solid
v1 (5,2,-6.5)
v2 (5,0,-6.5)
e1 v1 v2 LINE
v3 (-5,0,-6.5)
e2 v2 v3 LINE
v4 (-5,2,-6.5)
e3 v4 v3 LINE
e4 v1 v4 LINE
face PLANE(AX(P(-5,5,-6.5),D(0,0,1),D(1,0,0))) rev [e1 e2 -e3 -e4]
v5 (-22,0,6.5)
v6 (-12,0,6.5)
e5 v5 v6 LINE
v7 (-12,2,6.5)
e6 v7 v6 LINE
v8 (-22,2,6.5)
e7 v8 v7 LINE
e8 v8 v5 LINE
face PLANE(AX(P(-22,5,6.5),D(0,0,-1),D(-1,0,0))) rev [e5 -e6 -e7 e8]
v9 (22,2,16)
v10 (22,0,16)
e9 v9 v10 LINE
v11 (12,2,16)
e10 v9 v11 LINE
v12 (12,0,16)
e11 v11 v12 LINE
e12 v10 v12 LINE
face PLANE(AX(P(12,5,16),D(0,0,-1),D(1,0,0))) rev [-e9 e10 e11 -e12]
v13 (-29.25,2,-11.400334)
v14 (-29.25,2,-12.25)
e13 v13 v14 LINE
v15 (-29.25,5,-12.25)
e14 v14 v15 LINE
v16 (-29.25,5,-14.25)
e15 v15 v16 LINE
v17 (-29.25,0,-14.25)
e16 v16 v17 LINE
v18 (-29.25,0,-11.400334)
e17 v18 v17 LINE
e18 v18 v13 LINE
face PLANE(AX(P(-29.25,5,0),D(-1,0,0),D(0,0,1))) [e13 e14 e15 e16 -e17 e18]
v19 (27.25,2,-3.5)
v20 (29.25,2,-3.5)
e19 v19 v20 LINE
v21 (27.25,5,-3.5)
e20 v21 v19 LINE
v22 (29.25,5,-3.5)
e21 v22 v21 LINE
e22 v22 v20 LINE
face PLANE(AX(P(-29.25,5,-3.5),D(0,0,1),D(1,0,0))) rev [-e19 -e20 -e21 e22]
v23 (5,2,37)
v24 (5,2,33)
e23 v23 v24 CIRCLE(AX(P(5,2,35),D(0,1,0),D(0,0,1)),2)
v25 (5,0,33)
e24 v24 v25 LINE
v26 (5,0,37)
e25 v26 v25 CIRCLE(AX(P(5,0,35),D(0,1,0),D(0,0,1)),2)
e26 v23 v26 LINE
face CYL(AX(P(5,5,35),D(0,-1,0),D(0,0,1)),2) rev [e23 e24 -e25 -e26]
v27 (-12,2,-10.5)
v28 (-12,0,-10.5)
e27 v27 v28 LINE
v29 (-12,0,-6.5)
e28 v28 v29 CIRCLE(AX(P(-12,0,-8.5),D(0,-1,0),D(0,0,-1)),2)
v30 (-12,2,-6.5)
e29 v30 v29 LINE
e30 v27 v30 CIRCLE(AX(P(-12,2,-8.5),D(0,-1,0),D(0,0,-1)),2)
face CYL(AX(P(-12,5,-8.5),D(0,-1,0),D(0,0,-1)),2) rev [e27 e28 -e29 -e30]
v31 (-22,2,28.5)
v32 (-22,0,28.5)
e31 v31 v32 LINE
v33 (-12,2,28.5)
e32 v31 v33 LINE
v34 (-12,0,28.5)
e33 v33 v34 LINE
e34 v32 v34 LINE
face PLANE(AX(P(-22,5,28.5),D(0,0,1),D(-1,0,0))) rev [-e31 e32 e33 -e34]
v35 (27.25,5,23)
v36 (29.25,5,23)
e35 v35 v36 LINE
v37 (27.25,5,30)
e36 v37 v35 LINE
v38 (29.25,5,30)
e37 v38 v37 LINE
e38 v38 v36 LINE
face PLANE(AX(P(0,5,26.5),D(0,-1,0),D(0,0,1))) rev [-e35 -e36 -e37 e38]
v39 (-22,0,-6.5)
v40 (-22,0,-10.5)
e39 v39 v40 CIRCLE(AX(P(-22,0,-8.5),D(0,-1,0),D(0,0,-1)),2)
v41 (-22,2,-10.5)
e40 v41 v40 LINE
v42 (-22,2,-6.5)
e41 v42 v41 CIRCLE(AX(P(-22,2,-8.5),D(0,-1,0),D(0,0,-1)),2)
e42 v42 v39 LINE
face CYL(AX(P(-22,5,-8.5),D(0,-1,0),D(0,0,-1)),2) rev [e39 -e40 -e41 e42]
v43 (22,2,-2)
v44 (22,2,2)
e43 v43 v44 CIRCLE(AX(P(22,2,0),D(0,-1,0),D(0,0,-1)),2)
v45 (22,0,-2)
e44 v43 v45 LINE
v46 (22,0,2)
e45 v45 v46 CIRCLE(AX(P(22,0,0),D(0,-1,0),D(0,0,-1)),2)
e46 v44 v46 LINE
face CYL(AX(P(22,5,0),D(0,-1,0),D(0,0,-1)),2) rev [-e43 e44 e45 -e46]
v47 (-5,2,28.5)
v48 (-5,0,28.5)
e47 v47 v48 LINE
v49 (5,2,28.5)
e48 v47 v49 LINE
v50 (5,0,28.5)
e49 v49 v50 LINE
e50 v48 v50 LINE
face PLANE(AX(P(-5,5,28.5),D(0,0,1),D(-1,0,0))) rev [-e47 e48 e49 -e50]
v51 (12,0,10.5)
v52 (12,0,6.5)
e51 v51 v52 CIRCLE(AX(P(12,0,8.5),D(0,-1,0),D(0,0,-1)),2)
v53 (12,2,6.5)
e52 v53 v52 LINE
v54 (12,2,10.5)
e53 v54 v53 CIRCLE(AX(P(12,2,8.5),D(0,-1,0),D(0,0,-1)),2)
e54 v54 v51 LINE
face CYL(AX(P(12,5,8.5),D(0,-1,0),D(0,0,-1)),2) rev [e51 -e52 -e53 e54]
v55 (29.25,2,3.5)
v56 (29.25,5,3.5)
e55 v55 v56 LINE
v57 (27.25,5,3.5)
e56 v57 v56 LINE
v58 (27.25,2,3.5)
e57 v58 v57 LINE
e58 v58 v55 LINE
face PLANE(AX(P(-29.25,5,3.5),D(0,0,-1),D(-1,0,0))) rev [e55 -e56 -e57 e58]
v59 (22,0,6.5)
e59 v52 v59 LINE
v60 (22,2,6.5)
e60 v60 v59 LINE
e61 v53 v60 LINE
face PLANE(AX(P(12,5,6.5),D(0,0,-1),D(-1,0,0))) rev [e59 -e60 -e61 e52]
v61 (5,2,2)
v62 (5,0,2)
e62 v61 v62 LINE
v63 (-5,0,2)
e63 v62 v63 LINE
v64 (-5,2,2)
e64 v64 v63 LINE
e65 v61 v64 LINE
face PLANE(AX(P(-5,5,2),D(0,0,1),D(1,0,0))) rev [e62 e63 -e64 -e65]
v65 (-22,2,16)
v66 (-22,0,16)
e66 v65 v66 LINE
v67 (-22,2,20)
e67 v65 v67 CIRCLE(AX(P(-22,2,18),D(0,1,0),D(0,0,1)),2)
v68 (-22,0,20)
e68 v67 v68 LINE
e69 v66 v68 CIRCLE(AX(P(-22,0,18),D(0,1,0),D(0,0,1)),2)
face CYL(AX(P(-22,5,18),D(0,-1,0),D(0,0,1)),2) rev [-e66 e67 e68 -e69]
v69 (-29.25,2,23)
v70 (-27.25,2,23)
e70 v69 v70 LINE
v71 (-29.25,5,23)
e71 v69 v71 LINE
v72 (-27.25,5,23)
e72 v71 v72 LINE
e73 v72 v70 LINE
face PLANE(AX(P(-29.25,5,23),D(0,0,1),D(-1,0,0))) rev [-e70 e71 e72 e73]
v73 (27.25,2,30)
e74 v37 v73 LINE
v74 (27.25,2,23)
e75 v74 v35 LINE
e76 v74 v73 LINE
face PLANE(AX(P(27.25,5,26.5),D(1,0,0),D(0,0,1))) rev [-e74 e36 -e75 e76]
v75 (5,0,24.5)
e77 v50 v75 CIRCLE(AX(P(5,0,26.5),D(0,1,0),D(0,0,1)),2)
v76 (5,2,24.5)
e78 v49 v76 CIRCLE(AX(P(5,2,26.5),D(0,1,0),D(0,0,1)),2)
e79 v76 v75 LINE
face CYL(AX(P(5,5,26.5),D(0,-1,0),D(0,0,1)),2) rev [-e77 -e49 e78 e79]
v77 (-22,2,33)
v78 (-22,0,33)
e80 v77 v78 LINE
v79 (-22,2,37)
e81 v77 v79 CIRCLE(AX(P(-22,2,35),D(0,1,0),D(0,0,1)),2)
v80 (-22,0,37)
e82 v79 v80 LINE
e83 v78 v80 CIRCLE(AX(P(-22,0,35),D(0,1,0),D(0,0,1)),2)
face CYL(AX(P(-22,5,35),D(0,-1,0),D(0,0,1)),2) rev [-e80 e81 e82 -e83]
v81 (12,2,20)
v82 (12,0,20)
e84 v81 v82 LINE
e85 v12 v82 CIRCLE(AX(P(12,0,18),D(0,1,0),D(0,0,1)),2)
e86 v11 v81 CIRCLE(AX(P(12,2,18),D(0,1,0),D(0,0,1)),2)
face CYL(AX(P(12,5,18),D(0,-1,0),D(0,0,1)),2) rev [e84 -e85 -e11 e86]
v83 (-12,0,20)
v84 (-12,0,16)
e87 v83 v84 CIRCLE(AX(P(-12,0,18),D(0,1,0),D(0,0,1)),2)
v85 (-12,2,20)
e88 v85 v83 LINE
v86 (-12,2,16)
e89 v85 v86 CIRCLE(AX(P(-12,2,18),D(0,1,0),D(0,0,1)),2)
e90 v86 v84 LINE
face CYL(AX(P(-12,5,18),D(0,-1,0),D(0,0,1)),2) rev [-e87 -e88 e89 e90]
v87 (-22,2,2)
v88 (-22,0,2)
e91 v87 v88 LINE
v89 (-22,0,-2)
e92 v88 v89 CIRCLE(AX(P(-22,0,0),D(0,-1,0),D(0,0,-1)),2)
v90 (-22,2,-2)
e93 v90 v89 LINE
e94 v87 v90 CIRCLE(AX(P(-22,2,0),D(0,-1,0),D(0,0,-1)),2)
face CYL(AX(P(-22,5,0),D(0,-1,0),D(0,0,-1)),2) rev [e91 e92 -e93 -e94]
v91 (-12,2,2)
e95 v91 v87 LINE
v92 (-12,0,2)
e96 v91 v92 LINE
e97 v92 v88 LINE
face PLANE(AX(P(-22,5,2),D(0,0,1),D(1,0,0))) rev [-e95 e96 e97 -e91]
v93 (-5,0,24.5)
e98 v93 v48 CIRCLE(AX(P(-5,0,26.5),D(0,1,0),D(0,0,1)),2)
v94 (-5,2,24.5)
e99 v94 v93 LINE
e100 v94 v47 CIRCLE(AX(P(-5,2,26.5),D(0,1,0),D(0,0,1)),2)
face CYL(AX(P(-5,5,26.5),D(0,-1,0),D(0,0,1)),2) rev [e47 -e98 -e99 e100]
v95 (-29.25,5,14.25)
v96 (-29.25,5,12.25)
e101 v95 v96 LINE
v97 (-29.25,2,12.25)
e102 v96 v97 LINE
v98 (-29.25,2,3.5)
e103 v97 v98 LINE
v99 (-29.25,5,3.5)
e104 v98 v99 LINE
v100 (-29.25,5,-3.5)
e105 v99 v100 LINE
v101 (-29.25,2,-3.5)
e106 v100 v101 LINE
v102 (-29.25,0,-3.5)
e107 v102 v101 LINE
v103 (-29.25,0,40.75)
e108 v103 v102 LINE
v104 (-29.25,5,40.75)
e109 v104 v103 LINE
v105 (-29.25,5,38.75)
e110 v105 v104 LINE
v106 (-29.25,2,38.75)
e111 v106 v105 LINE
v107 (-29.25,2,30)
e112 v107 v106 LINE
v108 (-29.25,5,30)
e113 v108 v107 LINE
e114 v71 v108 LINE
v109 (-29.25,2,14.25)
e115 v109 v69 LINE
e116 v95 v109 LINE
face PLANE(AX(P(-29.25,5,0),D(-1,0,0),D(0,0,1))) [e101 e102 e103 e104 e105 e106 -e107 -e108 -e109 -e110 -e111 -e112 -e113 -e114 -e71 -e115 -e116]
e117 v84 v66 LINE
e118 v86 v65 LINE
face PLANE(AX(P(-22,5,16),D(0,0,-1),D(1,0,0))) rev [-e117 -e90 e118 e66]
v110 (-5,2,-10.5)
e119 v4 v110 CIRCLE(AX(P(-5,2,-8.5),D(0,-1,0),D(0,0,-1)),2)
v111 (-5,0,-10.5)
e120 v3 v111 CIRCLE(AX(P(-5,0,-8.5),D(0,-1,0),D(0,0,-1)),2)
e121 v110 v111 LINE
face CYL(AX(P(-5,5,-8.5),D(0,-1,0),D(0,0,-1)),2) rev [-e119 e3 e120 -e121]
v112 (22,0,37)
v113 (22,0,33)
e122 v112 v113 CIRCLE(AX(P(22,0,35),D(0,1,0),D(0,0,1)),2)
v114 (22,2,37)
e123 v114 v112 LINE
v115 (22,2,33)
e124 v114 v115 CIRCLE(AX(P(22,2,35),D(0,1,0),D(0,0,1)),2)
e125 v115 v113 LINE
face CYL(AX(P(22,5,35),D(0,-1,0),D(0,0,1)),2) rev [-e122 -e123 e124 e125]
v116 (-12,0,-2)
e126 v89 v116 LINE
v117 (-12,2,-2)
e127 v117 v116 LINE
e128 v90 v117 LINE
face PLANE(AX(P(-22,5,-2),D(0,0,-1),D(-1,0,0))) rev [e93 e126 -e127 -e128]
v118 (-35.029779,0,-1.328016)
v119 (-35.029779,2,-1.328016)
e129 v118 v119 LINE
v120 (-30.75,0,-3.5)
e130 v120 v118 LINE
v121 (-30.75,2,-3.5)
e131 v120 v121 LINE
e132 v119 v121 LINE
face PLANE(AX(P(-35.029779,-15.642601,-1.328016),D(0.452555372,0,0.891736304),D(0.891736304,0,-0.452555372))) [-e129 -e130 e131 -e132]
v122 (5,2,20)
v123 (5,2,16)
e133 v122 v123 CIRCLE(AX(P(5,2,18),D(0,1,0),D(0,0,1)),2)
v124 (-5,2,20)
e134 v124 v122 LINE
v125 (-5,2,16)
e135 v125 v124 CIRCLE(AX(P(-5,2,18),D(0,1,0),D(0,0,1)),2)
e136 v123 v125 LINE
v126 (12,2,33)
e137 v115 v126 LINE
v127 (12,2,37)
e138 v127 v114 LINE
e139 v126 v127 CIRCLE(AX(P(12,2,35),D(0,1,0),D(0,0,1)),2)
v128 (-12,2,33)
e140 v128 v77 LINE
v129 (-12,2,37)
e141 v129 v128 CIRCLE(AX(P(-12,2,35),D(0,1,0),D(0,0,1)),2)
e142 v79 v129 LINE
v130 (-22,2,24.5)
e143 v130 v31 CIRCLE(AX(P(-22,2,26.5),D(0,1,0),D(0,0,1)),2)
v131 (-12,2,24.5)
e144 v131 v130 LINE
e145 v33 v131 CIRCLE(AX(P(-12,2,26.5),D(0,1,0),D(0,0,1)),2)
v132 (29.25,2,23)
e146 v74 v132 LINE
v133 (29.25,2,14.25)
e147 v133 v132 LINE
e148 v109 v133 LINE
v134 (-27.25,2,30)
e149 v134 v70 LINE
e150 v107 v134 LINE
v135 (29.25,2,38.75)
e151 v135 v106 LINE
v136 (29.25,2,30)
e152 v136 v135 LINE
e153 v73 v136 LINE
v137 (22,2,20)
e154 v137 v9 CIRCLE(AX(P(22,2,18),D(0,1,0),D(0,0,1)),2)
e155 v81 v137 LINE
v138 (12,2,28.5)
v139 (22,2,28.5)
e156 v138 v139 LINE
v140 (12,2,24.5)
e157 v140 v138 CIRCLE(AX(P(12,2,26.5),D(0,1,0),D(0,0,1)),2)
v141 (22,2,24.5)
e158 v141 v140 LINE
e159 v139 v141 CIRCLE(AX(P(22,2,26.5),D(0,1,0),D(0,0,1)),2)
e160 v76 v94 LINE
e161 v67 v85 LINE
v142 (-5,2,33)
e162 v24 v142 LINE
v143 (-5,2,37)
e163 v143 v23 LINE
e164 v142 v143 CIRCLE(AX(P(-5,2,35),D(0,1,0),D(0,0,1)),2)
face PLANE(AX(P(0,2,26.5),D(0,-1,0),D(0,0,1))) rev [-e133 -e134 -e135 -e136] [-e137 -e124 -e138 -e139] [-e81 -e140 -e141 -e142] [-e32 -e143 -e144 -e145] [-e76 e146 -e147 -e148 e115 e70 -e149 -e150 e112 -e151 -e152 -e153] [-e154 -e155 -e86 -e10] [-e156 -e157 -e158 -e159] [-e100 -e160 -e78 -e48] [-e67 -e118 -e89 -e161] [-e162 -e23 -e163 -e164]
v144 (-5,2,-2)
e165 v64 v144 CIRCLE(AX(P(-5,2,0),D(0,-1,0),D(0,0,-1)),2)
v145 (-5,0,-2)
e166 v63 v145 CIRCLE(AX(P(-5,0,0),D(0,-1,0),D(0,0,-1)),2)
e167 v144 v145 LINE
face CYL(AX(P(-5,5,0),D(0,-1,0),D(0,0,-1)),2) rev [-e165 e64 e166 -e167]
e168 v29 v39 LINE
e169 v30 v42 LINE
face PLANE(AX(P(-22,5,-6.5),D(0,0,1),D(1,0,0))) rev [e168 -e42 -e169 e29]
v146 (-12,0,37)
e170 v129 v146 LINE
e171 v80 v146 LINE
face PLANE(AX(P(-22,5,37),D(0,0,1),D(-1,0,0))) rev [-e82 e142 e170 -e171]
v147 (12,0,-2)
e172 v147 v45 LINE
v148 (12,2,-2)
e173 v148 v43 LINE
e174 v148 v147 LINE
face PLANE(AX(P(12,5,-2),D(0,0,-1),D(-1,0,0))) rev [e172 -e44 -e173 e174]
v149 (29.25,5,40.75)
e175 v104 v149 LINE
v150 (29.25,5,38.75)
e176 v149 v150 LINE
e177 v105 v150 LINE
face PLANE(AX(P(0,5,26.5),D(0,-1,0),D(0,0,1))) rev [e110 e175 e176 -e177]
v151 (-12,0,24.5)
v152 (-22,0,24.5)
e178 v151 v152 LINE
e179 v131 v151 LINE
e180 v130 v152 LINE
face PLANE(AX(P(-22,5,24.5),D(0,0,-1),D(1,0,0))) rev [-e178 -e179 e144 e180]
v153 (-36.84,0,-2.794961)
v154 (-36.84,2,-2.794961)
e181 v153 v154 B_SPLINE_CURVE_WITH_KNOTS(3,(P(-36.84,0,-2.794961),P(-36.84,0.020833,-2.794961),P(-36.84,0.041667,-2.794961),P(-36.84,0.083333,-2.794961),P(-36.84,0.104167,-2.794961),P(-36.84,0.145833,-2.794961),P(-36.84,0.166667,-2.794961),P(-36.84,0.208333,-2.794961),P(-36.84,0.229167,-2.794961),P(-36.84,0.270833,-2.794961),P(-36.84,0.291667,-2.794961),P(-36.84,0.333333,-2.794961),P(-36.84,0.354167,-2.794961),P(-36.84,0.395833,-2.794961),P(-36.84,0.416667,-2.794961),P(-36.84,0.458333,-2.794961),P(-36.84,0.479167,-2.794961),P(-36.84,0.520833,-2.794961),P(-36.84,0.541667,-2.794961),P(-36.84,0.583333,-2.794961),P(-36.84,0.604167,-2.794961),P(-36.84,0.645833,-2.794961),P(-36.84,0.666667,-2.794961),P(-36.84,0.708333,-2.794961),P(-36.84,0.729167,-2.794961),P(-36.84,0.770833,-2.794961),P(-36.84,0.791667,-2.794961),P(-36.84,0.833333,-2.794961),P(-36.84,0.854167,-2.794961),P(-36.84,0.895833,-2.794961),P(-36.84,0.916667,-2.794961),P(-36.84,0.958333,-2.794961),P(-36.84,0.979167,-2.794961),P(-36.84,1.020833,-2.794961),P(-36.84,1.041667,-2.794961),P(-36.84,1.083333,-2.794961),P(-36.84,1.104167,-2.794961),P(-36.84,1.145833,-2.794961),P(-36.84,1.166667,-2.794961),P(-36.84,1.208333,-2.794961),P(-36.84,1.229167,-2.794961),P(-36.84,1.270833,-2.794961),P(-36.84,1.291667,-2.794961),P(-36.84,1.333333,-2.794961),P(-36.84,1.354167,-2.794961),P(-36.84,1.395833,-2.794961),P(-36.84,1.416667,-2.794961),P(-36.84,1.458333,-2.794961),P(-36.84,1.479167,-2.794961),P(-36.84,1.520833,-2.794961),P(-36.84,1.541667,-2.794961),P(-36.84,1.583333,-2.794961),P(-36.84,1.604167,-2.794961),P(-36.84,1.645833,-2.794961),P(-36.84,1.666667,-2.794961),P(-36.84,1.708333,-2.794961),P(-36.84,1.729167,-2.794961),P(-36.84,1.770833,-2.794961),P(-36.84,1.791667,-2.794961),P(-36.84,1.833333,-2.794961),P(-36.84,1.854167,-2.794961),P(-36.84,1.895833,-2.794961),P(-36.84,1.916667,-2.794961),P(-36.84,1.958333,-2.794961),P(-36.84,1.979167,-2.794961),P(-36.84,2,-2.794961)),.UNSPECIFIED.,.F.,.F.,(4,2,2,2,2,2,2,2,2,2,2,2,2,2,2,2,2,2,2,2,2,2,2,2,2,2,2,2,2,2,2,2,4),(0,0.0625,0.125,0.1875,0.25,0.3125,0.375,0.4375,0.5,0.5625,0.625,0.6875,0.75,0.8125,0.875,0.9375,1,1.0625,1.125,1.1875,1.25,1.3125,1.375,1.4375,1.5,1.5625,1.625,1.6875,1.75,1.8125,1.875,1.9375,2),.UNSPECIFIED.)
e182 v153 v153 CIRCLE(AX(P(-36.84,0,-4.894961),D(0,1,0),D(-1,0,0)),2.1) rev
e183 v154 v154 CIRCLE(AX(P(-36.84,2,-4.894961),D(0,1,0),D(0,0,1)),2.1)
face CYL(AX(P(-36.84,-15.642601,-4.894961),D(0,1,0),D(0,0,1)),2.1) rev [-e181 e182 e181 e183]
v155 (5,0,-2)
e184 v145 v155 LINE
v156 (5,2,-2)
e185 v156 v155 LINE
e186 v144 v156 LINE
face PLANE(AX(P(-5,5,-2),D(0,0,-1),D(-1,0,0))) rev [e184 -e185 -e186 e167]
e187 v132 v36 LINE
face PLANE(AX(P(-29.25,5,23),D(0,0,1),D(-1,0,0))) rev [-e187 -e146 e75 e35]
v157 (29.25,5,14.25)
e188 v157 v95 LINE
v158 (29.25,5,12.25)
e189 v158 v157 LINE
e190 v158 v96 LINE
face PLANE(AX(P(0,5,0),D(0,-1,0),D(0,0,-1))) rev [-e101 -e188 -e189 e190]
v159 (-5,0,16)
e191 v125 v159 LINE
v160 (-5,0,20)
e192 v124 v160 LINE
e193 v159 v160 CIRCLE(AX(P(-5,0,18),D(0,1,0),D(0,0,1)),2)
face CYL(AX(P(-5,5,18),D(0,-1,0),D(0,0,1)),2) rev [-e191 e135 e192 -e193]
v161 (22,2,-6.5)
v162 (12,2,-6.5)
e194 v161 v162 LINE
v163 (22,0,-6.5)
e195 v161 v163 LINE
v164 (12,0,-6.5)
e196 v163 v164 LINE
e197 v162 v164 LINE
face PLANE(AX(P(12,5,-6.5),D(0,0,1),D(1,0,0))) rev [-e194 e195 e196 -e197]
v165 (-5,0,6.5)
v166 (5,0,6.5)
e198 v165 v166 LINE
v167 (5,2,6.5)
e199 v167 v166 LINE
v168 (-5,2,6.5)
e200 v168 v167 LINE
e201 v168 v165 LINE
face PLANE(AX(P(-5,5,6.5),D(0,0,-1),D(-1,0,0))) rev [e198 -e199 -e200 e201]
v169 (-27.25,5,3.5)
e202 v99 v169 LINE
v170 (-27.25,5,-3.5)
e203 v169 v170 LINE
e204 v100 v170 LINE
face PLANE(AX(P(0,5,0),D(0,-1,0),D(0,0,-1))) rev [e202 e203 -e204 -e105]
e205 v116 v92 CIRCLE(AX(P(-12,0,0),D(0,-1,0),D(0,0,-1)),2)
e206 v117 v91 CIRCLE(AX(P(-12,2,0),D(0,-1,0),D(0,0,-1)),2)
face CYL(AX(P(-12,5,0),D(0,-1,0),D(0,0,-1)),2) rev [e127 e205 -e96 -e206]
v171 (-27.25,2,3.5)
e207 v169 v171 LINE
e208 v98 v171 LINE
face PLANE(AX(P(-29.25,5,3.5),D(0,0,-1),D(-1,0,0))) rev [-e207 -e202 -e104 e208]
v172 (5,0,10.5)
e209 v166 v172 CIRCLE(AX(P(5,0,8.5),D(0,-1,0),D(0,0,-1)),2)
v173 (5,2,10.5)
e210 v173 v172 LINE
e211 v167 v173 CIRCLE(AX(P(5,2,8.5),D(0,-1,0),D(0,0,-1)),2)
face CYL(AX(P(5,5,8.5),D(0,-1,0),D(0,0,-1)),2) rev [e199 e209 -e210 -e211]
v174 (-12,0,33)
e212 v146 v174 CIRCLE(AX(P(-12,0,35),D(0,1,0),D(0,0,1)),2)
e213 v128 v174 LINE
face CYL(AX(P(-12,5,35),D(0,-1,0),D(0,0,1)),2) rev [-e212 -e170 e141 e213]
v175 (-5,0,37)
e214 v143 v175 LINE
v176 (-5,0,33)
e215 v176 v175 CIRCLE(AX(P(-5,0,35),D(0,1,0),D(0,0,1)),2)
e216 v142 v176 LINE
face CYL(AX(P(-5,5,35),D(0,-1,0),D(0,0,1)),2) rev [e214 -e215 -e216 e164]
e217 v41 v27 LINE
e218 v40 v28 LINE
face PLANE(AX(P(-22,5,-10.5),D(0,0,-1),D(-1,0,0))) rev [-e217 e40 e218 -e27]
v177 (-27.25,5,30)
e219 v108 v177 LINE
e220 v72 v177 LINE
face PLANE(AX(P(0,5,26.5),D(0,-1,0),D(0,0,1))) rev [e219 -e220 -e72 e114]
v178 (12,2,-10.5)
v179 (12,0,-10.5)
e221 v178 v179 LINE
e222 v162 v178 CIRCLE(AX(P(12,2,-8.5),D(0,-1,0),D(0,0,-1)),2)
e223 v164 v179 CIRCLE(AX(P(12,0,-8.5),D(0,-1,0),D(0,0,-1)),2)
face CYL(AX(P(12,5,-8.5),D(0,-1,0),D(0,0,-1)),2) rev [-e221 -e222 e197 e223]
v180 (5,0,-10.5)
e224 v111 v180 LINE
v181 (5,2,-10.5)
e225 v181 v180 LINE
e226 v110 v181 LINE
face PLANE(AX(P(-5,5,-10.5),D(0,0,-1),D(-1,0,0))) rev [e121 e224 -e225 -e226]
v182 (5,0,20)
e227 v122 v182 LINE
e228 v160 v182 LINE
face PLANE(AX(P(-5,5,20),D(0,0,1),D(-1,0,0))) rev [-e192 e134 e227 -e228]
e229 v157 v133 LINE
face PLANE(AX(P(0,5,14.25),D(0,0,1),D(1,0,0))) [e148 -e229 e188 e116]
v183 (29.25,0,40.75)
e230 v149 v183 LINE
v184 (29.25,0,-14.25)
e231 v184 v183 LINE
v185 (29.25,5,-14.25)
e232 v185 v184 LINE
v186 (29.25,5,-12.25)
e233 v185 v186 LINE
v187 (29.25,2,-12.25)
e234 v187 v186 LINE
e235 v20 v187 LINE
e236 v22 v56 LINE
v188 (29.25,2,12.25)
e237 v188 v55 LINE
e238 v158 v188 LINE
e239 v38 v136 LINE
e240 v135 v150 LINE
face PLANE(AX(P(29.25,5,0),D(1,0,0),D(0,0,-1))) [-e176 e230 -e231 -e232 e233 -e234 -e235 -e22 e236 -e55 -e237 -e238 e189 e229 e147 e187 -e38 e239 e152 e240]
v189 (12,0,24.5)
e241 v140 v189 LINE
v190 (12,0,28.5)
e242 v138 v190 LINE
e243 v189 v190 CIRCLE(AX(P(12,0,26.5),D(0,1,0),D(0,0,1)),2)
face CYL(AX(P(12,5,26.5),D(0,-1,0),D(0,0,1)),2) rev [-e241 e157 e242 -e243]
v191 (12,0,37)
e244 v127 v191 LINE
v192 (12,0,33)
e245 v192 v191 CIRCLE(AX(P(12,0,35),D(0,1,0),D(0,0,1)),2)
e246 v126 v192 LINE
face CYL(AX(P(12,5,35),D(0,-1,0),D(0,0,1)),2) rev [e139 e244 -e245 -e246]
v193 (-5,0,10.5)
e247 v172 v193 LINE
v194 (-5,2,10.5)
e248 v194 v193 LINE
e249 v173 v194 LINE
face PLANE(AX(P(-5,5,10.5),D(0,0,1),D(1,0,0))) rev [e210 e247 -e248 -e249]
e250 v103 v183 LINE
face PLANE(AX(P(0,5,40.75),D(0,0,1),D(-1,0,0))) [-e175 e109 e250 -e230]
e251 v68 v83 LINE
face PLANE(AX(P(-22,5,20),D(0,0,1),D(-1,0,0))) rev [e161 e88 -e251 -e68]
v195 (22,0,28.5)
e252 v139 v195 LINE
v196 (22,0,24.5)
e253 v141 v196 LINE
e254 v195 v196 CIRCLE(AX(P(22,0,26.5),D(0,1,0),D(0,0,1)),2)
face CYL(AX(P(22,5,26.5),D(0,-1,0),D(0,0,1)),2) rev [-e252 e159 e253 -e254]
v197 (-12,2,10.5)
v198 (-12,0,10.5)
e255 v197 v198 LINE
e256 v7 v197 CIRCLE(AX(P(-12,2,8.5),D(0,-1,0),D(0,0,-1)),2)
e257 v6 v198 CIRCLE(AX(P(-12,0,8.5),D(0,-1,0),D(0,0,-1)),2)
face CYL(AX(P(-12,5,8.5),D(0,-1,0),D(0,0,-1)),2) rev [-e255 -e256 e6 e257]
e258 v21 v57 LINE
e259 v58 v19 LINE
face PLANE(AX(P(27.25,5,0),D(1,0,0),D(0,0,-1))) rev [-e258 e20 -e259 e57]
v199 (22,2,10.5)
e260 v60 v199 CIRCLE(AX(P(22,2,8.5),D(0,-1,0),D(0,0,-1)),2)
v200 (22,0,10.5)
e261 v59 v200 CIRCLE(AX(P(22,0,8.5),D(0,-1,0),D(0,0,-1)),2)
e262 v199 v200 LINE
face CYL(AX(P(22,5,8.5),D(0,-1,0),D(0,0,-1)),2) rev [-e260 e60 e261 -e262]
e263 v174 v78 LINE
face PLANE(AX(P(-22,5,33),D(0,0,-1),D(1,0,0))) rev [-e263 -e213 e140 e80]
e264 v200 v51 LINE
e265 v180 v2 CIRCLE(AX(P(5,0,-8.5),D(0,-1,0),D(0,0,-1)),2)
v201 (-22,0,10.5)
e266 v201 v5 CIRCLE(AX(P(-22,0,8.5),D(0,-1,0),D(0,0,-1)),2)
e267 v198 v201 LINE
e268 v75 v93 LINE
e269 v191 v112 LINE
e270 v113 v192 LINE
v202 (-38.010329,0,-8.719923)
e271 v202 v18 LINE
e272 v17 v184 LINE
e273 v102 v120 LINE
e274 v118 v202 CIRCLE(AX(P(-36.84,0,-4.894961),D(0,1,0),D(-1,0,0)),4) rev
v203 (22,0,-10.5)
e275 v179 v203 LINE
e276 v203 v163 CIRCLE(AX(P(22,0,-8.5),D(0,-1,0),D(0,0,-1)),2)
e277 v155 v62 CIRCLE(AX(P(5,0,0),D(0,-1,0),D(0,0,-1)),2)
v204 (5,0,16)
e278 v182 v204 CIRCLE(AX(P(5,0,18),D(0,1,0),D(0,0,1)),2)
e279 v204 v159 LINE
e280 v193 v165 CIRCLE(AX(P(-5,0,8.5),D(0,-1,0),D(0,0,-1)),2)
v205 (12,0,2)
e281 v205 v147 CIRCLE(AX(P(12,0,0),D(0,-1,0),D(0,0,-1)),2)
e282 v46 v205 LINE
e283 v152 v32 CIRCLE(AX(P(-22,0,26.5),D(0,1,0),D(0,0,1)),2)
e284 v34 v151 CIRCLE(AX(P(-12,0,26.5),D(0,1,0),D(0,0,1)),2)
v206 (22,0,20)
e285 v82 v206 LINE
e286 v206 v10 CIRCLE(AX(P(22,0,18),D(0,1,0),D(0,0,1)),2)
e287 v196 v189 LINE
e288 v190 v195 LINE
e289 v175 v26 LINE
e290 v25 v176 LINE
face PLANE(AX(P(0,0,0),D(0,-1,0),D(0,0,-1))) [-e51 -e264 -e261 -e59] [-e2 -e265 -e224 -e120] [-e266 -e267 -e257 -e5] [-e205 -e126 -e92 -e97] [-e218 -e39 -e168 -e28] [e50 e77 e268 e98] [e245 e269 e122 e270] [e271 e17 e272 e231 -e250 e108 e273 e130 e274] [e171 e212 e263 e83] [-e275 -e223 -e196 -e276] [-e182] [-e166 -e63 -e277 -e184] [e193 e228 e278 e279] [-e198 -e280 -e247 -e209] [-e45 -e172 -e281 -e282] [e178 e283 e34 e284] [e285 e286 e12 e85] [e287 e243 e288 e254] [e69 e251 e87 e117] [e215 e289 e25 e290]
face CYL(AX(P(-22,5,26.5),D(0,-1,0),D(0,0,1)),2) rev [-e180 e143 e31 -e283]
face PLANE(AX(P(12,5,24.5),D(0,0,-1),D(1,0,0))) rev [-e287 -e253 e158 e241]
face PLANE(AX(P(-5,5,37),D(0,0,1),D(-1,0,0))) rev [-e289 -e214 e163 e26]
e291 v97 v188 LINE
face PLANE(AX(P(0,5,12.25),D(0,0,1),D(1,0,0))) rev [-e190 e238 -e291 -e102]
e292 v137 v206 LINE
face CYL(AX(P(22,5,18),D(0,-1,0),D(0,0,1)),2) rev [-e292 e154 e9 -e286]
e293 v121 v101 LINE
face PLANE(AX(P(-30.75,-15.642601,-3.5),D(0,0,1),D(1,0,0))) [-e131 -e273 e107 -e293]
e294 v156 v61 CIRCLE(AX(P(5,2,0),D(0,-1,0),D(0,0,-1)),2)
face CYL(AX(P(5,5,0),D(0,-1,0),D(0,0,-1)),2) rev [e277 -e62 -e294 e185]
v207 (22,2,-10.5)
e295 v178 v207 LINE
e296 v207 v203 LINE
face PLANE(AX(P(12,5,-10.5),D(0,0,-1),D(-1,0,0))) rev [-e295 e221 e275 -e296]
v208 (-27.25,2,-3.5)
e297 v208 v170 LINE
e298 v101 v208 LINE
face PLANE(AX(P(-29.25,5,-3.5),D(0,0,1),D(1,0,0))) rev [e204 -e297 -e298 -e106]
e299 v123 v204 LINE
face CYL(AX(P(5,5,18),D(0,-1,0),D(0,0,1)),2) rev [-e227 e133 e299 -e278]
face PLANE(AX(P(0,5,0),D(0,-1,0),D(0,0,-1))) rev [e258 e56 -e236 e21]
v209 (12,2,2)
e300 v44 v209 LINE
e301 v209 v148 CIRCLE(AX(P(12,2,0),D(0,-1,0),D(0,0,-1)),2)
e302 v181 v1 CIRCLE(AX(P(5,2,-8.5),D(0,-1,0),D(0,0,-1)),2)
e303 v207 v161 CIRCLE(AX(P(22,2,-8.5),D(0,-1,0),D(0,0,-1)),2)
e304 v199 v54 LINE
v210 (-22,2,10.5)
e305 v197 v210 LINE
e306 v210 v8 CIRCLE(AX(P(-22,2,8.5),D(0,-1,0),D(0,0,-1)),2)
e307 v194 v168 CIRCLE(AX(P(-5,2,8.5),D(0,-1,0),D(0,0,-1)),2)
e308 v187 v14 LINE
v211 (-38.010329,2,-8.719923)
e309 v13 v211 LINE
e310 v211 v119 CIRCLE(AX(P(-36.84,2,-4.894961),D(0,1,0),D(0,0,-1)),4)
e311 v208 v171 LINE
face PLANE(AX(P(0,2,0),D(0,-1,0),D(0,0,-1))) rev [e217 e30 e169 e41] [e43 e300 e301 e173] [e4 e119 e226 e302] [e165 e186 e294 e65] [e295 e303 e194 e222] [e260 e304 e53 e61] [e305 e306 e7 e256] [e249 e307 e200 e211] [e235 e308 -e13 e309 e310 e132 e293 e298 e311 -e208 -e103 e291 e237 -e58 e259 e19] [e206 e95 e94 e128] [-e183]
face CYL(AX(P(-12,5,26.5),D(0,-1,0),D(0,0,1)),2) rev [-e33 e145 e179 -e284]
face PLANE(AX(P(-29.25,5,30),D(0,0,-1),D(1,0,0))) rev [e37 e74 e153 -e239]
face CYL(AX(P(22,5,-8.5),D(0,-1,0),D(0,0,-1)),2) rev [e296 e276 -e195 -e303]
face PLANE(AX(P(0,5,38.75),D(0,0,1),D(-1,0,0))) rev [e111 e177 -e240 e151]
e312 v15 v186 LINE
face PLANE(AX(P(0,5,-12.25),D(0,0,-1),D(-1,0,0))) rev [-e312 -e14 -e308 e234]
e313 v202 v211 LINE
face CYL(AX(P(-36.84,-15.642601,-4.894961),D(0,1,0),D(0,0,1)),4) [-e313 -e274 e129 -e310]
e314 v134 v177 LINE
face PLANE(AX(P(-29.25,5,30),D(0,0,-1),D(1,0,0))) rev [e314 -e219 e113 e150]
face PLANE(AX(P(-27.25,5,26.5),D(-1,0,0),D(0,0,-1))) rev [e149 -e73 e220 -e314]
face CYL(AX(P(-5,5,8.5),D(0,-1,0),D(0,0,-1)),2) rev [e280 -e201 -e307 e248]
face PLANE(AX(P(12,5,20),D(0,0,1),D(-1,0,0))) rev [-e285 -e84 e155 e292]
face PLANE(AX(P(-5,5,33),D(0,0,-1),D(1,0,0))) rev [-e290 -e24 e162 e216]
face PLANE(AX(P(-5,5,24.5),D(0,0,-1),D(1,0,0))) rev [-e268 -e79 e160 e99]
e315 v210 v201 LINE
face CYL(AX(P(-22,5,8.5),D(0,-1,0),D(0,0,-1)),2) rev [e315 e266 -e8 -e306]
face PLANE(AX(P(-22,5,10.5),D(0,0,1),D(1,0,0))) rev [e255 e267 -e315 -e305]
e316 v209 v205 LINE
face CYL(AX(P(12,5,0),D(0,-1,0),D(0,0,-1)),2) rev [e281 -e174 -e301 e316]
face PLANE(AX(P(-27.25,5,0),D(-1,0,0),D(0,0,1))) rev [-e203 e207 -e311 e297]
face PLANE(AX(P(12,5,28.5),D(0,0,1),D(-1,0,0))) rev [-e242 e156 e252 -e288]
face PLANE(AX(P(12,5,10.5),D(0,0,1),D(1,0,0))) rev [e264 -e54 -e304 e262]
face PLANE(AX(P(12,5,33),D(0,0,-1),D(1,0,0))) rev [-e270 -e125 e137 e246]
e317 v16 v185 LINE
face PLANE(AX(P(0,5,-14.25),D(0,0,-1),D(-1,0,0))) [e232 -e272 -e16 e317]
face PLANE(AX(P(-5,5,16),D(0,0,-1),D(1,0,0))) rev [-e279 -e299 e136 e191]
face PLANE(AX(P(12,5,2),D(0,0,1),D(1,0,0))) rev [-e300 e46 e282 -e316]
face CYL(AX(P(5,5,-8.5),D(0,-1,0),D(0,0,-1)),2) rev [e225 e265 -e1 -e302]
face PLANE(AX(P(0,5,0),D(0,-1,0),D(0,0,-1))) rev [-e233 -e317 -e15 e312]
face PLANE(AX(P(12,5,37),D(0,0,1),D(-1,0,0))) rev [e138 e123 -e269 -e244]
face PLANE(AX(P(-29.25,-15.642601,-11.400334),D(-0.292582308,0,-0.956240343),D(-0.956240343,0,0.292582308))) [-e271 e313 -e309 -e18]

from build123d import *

# Parameters (mm, degrees)
SKETCH1_W           = 54.5
SKETCH1_H           = 24.5
BOSS_EXTRUDE1_DEPTH = 2
BOSS_EXTRUDE2_START = -2
SKETCH2_W           = 58.5
SKETCH2_H           = 28.5
SKETCH2_W_2         = 54.5
SKETCH2_H_2         = 24.5
BOSS_EXTRUDE2_DEPTH = 5
CUT_EXTRUDE1_DEPTH  = 33.918459867
FILL_PATTERN1_DEPTH = 2
LPATTERN1_COUNT     = 2
LPATTERN1_PITCH     = 8.5
LPATTERN1_COL_COUNT = 2
LPATTERN1_COL_PITCH = 8.5
SKETCH13_W          = 8.75
SKETCH13_H          = 3
CUT_EXTRUDE2_DEPTH  = 61.417816081
SKETCH34_R          = 2.1
BOSS_EXTRUDE4_DEPTH = 2


# Read off the part's stored shape, not the designer's step: Fill Pattern1
with BuildPart() as part:
    # Sketch1 → Boss-Extrude1 (new body)
    with BuildSketch(Plane(origin=(0, 0, 0), x_dir=(1, 0, 0), z_dir=(0, 1, 0))):
        Rectangle(SKETCH1_W, SKETCH1_H)
    extrude(amount=BOSS_EXTRUDE1_DEPTH)

    # Sketch2 → Boss-Extrude2 (add)
    with BuildSketch(Plane(origin=(0, 2, 0), x_dir=(1, 0, 0), z_dir=(0, 1, 0)).offset(BOSS_EXTRUDE2_START)):
        Rectangle(SKETCH2_W, SKETCH2_H)
        Rectangle(SKETCH2_W_2, SKETCH2_H_2, mode=Mode.SUBTRACT)
    extrude(amount=BOSS_EXTRUDE2_DEPTH)

    # Sketch5 → Cut-Extrude1 (cut, through all)
    with BuildSketch(Plane.XZ):
        with BuildLine():
            Line((-5, 2), (5, 2))
            ThreePointArc((5, 2), (7, 0), (5, -2))
            Line((5, -2), (-5, -2))
            ThreePointArc((-5, -2), (-7, 0), (-5, 2))
        make_face()
    cut_extrude1 = extrude(amount=-CUT_EXTRUDE1_DEPTH, mode=Mode.SUBTRACT)

    # Fill Pattern1 outline → Fill Pattern1 (cut)
    with BuildSketch(Plane(origin=(0, 0, 0), x_dir=(1, 0, 0), z_dir=(0, 1, 0))):
        with BuildLine():
            ThreePointArc((-22, 2), (-24, 0), (-22, -2))
            Line((-22, -2), (-12, -2))
            ThreePointArc((-12, -2), (-10, 0), (-12, 2))
            Line((-12, 2), (-22, 2))
        make_face()
        with BuildLine():
            ThreePointArc((12, 2), (10, 0), (12, -2))
            Line((12, -2), (22, -2))
            ThreePointArc((22, -2), (24, 0), (22, 2))
            Line((22, 2), (12, 2))
        make_face()
        with BuildLine():
            ThreePointArc((-22, 10.5), (-24, 8.5), (-22, 6.5))
            Line((-22, 6.5), (-12, 6.5))
            ThreePointArc((-12, 6.5), (-10, 8.5), (-12, 10.5))
            Line((-12, 10.5), (-22, 10.5))
        make_face()
        with BuildLine():
            ThreePointArc((12, 10.5), (10, 8.5), (12, 6.5))
            Line((12, 6.5), (22, 6.5))
            ThreePointArc((22, 6.5), (24, 8.5), (22, 10.5))
            Line((22, 10.5), (12, 10.5))
        make_face()
        with BuildLine():
            ThreePointArc((-22, -6.5), (-24, -8.5), (-22, -10.5))
            Line((-22, -10.5), (-12, -10.5))
            ThreePointArc((-12, -10.5), (-10, -8.5), (-12, -6.5))
            Line((-12, -6.5), (-22, -6.5))
        make_face()
        with BuildLine():
            ThreePointArc((12, -6.5), (10, -8.5), (12, -10.5))
            Line((12, -10.5), (22, -10.5))
            ThreePointArc((22, -10.5), (24, -8.5), (22, -6.5))
            Line((22, -6.5), (12, -6.5))
        make_face()
    extrude(amount=FILL_PATTERN1_DEPTH, mode=Mode.SUBTRACT)

    # LPattern1: Cut-Extrude1 ×2
    with Locations(*[(0, 0, i * LPATTERN1_PITCH) for i in range(1, LPATTERN1_COUNT)]):
        add(cut_extrude1, mode=Mode.SUBTRACT)

    # LPattern1 col: Cut-Extrude1 ×2
    with Locations(*[(0, 0, -i * LPATTERN1_COL_PITCH) for i in range(1, LPATTERN1_COL_COUNT)]):
        add(cut_extrude1, mode=Mode.SUBTRACT)

    # Sketch13 → Cut-Extrude2 (cut, through all)
    with BuildSketch(Plane(origin=(29.25, 0, 0), x_dir=(0, 0, -1), z_dir=(1, 0, 0))):
        with Locations((-7.875, 3.5)):
            Rectangle(SKETCH13_W, SKETCH13_H)
        with Locations((7.875, 3.5)):
            Rectangle(SKETCH13_W, SKETCH13_H)
    extrude(amount=-CUT_EXTRUDE2_DEPTH, mode=Mode.SUBTRACT)

    # Mirror1: part across plane


with BuildPart() as part_1:
    add(part.part)
    add(part.part.mirror(Plane.XY.offset(13.25)))

    # Sketch34 → Boss-Extrude4 (add)
    with BuildSketch(Plane(origin=(0, 2, 0), x_dir=(1, 0, 0), z_dir=(0, 1, 0))):
        with BuildLine():
            Line((-29.25, 11.400334068), (-38.010329233, 8.719922842))
            ThreePointArc((-38.010329233, 8.719922842), (-40.54977577, 3.399112638), (-35.029778513, 1.328016256))
            Line((-35.029778513, 1.328016256), (-30.75, 3.5))
            Line((-30.75, 3.5), (-29.25, 3.5))
            Line((-29.25, 3.5), (-29.25, 11.400334068))
        make_face()
        with Locations(Location((-36.84, 4.894961472, 0), (0, 0, 270))):
            Circle(SKETCH34_R, mode=Mode.SUBTRACT)
    extrude(amount=-BOSS_EXTRUDE4_DEPTH)


solid = part_1.part
